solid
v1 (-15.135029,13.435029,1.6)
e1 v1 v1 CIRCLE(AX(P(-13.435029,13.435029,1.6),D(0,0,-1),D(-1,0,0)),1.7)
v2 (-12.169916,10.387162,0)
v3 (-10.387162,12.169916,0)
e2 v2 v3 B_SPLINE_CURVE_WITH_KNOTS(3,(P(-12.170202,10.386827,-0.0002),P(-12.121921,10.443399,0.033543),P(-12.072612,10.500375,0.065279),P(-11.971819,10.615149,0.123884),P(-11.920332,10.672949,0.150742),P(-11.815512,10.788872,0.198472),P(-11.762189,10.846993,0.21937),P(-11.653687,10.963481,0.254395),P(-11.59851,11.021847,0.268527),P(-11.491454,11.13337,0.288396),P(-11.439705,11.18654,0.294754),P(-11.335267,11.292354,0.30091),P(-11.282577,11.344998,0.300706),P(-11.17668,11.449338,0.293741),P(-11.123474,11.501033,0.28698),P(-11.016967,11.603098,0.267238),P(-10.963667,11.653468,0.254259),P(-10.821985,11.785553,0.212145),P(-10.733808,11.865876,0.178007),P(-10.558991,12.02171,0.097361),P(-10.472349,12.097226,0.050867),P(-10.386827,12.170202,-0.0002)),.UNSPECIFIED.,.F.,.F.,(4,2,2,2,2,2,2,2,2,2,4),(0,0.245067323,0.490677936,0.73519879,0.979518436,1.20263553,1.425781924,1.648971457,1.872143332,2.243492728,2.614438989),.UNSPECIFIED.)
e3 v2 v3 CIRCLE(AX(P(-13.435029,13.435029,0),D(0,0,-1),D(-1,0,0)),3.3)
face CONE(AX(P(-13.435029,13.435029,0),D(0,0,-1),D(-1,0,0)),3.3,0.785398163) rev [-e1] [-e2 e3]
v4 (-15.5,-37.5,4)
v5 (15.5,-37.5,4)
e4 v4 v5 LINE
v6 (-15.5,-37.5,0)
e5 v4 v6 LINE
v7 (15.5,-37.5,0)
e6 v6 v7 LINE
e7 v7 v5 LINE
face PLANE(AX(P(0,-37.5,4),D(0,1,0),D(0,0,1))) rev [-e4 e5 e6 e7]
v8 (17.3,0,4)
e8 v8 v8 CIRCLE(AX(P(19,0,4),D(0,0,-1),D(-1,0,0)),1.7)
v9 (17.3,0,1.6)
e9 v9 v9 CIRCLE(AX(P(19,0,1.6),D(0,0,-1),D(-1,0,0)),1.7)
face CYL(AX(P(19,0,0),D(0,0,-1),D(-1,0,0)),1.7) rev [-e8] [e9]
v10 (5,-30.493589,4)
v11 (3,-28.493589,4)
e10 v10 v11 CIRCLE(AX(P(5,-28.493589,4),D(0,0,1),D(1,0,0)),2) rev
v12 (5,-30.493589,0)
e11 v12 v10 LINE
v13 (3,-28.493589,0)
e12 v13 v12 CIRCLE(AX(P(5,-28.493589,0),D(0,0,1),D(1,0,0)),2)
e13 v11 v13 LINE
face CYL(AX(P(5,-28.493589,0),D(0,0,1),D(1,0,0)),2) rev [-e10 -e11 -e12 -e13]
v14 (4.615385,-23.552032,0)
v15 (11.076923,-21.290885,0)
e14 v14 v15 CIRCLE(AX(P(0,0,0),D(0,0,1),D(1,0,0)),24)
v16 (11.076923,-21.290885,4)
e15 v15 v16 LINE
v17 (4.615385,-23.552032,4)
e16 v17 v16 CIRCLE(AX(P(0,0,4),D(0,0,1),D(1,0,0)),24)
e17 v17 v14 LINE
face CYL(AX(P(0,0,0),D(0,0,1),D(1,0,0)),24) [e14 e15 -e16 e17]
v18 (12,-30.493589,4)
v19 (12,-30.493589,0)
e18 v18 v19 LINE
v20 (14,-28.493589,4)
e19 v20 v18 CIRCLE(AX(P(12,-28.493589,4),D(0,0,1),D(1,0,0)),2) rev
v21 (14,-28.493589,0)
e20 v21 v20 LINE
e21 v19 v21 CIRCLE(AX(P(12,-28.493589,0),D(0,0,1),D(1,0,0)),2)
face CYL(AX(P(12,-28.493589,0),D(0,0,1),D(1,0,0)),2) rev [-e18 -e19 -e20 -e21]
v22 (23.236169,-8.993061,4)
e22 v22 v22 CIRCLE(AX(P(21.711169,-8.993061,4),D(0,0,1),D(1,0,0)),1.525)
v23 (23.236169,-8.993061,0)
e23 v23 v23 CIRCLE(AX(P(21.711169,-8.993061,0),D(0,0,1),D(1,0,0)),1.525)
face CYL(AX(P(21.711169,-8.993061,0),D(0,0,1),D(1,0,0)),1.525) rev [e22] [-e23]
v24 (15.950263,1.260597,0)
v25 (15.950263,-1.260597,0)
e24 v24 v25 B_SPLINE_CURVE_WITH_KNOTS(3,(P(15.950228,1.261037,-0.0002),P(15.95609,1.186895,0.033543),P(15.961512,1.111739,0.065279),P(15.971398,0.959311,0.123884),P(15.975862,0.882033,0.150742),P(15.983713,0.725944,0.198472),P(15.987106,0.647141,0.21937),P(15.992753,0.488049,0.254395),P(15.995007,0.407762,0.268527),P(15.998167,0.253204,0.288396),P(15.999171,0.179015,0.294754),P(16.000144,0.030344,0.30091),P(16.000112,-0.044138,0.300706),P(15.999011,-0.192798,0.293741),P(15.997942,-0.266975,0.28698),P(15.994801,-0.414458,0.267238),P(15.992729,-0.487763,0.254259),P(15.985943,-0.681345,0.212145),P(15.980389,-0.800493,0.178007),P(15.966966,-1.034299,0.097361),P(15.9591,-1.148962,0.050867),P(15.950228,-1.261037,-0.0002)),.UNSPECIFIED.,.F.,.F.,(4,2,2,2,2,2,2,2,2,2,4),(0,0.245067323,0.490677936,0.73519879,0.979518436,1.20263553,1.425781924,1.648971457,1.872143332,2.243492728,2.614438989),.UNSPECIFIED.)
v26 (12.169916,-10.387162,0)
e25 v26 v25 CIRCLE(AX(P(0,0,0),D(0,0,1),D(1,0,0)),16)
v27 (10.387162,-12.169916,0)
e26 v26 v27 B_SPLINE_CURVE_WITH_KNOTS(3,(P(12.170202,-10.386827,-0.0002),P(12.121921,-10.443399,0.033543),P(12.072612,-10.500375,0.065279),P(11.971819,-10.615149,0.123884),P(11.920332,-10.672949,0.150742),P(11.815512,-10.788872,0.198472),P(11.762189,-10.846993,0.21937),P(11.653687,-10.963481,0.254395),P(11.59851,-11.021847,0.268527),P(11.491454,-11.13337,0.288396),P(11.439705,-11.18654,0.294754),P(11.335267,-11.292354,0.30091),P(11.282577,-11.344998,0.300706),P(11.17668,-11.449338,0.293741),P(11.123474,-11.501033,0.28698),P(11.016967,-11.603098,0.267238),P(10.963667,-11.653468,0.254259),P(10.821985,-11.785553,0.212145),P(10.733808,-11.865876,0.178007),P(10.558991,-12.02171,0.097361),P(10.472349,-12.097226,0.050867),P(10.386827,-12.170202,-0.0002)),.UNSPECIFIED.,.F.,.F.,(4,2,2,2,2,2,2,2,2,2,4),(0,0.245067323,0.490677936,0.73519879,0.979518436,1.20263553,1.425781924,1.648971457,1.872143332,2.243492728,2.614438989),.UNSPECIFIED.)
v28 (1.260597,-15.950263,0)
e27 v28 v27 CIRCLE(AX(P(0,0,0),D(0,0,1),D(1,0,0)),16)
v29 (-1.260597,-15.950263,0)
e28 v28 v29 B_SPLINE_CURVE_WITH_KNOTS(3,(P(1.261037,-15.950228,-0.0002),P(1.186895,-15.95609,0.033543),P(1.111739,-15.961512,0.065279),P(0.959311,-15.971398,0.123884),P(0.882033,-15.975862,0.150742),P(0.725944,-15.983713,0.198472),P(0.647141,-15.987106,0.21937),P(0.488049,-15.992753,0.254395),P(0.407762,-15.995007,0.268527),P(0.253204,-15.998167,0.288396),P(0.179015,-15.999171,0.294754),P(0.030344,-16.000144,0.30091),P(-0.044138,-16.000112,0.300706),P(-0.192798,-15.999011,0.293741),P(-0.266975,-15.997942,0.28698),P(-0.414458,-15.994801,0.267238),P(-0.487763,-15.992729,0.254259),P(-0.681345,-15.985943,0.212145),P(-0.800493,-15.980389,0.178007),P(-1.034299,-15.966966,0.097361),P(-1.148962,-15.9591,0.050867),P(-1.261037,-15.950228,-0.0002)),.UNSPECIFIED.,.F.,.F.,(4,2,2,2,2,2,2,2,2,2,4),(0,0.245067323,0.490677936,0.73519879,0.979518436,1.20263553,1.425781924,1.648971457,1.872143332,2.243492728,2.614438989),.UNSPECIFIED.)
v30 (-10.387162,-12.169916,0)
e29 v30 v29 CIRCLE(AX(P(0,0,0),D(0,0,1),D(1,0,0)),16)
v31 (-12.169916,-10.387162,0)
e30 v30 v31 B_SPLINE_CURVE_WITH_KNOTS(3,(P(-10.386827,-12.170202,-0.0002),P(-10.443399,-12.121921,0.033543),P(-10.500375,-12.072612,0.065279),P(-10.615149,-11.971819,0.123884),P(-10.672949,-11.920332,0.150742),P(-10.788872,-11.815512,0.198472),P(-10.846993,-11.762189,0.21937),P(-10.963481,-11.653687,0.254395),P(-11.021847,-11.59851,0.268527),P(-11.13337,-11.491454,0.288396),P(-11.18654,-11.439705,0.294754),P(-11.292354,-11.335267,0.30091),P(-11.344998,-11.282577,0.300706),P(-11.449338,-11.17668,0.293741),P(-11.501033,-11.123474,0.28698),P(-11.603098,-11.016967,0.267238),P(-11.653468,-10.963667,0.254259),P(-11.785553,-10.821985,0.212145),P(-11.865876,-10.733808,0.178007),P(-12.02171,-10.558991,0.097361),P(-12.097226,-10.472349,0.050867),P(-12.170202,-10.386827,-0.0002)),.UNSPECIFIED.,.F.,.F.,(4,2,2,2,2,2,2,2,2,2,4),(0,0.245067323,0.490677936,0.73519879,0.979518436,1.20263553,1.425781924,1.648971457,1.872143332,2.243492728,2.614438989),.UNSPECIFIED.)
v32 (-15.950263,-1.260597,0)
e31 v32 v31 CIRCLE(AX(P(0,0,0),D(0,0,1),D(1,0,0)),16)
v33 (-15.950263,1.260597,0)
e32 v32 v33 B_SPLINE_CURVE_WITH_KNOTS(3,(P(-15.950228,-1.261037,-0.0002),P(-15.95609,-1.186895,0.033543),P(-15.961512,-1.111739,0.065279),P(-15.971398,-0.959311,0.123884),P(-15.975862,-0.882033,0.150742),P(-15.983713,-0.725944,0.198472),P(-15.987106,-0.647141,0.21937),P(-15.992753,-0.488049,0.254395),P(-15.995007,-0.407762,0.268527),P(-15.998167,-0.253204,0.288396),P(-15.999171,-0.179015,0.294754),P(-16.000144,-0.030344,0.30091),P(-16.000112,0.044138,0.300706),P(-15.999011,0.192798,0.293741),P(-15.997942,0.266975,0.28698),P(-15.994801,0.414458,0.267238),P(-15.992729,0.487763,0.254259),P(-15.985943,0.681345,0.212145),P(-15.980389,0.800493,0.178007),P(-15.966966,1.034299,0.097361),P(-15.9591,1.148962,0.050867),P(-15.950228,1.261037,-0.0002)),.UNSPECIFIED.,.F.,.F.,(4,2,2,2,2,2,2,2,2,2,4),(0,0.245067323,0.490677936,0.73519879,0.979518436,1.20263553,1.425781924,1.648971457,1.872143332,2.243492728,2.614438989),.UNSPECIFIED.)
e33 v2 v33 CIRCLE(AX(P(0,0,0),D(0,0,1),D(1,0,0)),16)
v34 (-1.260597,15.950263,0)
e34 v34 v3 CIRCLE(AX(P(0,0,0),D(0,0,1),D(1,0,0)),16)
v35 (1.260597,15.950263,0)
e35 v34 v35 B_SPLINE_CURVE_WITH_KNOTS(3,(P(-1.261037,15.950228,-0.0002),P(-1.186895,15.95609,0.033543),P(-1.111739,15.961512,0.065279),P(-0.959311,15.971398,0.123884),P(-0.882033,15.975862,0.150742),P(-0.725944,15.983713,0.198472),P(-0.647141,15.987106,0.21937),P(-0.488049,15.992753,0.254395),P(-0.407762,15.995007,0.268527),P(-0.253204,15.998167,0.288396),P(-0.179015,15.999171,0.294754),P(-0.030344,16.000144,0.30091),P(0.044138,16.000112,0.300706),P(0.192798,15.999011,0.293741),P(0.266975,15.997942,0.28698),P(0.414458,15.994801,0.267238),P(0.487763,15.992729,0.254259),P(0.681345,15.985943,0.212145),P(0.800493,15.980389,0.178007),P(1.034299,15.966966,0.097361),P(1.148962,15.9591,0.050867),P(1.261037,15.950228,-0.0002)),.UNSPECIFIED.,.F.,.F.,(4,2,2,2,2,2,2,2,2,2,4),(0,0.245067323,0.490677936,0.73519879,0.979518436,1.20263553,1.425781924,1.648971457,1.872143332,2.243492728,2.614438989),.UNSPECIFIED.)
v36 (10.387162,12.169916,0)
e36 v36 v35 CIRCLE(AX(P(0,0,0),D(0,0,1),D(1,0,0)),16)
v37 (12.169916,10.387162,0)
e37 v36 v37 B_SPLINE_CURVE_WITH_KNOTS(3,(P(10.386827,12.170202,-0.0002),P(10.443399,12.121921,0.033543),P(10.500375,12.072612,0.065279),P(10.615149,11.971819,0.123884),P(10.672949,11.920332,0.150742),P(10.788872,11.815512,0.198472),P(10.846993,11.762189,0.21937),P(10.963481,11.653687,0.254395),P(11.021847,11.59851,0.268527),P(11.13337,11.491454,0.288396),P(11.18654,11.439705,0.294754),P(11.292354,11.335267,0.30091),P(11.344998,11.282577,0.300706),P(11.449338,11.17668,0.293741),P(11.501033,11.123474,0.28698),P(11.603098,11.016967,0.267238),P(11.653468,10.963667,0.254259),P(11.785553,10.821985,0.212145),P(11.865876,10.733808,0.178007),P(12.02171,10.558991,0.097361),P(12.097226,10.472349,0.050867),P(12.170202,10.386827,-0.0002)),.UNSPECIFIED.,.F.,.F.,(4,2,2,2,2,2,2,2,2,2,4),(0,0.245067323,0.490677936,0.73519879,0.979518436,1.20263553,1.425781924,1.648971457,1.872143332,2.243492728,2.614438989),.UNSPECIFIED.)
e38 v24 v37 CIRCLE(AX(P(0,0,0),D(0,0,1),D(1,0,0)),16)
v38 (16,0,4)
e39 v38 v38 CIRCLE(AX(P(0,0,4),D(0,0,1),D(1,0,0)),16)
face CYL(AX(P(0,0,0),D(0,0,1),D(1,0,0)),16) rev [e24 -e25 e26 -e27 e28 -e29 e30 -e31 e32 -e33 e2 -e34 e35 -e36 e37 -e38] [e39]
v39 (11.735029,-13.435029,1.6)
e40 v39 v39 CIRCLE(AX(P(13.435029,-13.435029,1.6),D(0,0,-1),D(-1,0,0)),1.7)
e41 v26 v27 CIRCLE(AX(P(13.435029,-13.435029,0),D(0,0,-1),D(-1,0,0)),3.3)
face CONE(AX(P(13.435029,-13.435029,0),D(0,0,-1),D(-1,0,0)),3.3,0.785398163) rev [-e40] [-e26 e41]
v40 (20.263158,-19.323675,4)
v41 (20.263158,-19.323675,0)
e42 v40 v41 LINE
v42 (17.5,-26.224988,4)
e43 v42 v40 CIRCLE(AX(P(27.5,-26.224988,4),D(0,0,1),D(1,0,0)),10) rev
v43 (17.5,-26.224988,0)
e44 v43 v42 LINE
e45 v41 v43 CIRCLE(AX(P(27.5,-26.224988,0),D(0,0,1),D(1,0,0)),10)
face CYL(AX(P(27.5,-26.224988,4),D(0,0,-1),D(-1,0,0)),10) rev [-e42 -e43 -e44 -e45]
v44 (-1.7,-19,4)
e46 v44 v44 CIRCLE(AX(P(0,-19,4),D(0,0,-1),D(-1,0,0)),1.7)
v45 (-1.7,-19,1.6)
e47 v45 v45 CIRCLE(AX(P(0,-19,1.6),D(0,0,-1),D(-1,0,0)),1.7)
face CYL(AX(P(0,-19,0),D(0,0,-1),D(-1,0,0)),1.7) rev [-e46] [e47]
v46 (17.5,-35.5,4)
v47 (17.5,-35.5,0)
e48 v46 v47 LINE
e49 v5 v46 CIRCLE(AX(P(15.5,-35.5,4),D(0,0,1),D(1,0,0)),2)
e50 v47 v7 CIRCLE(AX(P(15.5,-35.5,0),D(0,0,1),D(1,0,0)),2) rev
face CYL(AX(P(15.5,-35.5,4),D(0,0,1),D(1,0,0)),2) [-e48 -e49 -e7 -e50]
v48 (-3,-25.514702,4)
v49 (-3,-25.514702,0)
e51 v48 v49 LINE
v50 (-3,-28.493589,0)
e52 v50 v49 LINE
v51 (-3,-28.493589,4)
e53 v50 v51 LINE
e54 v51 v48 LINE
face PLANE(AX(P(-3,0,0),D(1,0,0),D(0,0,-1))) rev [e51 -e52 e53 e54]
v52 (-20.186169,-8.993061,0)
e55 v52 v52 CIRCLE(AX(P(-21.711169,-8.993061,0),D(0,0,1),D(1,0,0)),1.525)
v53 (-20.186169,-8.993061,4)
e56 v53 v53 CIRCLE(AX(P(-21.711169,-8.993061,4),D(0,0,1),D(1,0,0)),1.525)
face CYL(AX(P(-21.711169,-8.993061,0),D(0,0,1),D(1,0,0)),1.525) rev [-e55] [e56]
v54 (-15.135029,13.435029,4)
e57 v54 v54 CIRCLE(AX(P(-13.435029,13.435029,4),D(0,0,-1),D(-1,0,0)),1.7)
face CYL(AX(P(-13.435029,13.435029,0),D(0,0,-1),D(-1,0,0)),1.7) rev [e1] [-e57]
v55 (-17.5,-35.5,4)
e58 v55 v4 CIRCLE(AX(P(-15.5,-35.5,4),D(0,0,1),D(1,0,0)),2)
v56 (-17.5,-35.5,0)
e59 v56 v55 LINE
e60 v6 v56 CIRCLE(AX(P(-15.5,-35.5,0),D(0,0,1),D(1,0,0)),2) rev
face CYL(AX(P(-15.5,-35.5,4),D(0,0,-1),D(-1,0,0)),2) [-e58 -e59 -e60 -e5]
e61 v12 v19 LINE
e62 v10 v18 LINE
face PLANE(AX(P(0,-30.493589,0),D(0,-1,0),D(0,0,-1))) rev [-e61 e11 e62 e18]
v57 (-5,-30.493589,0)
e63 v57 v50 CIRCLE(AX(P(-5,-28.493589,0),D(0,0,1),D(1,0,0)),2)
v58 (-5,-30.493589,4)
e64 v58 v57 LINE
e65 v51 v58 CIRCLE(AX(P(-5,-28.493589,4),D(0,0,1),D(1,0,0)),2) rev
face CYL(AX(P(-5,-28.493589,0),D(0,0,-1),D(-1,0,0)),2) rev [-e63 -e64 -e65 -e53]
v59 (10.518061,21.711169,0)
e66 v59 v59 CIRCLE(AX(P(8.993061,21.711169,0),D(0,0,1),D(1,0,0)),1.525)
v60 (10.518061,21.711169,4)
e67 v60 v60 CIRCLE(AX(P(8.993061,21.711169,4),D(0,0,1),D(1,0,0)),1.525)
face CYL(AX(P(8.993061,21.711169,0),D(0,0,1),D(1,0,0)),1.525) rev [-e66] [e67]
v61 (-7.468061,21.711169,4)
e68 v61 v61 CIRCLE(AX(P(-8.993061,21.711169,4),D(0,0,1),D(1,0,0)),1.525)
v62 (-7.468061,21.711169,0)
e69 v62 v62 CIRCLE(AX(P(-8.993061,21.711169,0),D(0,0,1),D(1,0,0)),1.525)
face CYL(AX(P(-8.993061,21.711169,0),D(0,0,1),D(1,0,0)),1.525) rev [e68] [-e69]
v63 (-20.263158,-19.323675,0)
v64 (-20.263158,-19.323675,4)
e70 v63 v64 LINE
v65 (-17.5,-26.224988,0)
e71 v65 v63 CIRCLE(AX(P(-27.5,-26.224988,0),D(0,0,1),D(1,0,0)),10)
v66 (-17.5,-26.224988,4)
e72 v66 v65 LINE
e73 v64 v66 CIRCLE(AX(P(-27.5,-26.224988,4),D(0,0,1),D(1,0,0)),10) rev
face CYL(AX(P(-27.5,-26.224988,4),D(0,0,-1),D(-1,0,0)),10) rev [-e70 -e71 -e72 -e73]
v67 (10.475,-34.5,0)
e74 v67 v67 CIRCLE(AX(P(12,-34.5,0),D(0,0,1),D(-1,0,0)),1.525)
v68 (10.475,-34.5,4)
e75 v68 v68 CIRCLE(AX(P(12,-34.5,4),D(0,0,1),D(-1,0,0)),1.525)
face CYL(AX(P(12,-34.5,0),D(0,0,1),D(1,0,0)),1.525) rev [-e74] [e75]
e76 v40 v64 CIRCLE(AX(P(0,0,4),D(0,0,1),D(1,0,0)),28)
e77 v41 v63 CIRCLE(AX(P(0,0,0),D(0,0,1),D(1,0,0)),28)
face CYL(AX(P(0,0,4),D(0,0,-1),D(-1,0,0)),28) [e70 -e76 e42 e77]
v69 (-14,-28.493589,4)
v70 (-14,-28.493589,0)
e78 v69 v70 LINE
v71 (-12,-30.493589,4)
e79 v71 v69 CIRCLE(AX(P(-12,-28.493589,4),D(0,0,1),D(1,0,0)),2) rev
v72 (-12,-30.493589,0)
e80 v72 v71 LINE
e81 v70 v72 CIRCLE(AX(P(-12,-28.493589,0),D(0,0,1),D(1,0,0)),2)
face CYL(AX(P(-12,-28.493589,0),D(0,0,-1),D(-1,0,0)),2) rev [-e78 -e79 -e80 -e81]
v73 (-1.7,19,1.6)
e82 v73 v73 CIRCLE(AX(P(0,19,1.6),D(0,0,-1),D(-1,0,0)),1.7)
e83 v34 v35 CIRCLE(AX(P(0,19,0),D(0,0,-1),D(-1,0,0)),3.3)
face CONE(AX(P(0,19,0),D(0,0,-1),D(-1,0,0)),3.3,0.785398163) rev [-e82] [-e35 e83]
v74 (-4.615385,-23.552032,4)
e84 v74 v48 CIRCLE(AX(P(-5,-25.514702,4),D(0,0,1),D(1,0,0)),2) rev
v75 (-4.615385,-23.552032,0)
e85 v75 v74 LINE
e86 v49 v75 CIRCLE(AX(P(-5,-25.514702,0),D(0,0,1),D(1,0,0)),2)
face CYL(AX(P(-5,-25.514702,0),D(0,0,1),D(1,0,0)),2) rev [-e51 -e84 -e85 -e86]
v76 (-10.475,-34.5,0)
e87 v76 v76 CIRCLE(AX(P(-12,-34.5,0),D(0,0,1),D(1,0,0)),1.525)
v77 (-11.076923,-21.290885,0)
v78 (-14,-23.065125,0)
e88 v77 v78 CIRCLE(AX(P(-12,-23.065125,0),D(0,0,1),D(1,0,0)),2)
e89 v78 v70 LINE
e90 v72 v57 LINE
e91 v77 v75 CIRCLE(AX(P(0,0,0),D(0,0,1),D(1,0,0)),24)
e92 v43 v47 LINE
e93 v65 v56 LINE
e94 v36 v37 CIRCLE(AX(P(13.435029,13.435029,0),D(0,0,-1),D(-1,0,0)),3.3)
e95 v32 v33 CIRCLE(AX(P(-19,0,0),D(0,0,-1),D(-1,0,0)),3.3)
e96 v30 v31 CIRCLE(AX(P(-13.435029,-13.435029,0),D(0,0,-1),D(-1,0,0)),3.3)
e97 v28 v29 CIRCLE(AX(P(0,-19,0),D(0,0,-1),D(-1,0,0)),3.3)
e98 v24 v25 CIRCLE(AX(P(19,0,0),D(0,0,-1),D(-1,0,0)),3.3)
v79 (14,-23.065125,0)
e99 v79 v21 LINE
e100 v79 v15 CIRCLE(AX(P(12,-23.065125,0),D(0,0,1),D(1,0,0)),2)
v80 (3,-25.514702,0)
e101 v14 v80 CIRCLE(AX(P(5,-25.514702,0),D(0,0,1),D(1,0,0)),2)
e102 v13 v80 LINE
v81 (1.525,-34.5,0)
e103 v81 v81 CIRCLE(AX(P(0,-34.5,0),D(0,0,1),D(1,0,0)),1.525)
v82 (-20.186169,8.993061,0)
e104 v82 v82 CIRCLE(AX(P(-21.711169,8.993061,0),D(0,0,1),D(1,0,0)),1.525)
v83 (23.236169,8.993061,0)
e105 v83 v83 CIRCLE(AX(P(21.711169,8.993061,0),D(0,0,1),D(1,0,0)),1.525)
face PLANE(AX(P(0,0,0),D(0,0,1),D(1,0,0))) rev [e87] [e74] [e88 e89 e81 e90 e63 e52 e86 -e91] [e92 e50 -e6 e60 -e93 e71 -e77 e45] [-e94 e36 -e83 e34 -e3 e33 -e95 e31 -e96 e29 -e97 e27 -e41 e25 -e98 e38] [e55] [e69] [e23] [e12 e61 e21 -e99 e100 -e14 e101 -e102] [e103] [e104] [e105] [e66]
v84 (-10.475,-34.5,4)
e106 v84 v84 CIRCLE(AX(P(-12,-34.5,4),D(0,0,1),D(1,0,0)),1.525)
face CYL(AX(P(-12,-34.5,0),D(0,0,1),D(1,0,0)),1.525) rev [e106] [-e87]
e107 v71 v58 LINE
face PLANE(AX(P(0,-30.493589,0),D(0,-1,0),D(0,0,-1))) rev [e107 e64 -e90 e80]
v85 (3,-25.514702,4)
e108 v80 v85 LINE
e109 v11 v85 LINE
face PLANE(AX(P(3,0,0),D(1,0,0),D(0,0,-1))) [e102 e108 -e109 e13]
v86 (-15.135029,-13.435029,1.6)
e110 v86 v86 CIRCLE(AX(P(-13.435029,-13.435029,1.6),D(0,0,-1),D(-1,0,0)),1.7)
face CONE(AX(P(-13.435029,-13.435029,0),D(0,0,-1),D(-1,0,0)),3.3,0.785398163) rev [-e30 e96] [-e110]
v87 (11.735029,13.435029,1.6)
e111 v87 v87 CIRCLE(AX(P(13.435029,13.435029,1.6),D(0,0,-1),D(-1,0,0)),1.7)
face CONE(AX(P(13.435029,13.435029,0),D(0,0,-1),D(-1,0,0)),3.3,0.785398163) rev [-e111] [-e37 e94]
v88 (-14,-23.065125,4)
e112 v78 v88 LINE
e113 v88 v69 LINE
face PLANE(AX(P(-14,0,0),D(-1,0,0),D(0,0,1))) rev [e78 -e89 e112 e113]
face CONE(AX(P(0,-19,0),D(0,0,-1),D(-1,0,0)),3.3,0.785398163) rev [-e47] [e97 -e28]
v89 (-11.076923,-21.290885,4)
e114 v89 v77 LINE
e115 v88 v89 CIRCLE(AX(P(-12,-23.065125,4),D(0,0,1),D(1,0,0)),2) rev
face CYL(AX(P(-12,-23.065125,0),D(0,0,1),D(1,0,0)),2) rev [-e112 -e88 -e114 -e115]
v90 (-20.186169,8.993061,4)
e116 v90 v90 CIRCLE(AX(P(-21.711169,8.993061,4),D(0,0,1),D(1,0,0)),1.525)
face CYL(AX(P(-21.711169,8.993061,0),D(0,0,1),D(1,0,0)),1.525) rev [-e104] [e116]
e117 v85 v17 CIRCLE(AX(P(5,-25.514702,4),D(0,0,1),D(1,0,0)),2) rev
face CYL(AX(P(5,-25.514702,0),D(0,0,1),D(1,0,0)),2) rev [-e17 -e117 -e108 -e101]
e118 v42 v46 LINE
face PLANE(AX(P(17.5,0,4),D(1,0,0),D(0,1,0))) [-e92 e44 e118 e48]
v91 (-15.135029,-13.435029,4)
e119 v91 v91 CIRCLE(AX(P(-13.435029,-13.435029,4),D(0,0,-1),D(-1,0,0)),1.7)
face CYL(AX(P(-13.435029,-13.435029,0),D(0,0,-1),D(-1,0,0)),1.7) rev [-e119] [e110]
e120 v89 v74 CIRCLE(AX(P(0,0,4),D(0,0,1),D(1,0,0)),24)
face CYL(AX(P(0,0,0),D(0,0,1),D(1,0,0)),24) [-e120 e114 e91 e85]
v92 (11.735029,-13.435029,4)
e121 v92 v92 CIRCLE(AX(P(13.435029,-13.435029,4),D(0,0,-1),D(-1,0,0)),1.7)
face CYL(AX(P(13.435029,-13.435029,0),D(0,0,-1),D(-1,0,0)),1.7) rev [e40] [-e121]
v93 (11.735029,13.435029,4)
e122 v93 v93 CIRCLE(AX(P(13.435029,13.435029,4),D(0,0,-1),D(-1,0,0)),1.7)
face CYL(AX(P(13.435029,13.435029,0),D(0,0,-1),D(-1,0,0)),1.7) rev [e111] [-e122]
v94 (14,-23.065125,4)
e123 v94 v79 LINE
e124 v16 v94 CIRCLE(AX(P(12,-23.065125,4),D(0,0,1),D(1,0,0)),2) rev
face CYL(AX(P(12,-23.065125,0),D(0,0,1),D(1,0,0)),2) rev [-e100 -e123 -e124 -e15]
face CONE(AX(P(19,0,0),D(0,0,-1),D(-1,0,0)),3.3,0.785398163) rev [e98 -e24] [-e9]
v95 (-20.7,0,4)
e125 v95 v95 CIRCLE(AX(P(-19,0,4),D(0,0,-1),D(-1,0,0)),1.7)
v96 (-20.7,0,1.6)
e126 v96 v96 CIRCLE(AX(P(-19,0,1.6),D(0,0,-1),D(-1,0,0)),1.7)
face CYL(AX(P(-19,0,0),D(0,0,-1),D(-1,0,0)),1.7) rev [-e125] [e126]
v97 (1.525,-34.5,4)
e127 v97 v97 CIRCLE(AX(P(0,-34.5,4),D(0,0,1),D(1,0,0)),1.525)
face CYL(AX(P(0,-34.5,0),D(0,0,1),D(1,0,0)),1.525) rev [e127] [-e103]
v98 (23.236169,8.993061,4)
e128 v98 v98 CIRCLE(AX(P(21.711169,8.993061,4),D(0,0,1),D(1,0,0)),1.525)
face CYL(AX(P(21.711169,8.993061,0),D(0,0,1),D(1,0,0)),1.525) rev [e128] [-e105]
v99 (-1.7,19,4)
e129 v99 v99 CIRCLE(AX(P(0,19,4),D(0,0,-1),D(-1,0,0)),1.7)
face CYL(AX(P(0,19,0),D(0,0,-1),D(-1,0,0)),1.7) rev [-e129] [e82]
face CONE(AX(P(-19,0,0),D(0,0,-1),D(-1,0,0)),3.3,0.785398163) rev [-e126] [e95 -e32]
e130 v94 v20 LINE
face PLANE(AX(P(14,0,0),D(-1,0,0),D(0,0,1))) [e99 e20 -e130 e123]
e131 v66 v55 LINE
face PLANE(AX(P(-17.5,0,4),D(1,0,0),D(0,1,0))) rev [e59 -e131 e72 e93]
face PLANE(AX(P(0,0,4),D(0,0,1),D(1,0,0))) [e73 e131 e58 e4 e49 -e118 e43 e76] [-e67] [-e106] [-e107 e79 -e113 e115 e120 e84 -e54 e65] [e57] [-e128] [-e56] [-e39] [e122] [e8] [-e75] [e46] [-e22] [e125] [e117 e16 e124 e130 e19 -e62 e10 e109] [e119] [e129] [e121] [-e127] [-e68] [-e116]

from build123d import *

# Parameters (mm, degrees)
SKETCH_2_R                   = 28
SKETCH_2_R_2                 = 1.525
SKETCH_2_W                   = 35
SKETCH_2_H                   = 15.642507006
EXTRUDE_1_DEPTH              = 4
SKETCH_3_R                   = 16
CUT_EXTRUDE_1_DEPTH          = 47.97073557
SKETCH_4_R                   = 1.525
CUT_EXTRUDE_2_DEPTH          = 47.97073557
FILLET_1_R                   = 2
FILLET_2_R                   = 10
CUT_EXTRUDE_START            = -4
CUT_EXTRUDE_3_DEPTH          = 4
FILLET_3_R                   = 2
SKETCH_7_R                   = 1.525
CUT_EXTRUDE_4_DEPTH          = 47.97073557
HOLE_WIZARD_M3_1_D           = 3.4
HOLE_WIZARD_M3_1_CSINK_D     = 6.6
HOLE_WIZARD_M3_1_CSINK_ANGLE = 90


# Read off the part's stored shape, not the designer's step: 切除-拉伸3
with BuildPart() as part:
    # 草图2 → 凸台-拉伸1 (new body)
    # profile 1 of 2: a face of its own
    with BuildSketch(Plane.XY):
        Circle(SKETCH_2_R)
        with Locations((19, 0)):
            Circle(SKETCH_2_R_2, mode=Mode.SUBTRACT)
        with Locations((13.435028843, -13.435028843)):
            Circle(SKETCH_2_R_2, mode=Mode.SUBTRACT)
        with Locations((0, -19)):
            Circle(SKETCH_2_R_2, mode=Mode.SUBTRACT)
        with Locations((-13.435028843, -13.435028843)):
            Circle(SKETCH_2_R_2, mode=Mode.SUBTRACT)
        with Locations((-19, 0)):
            Circle(SKETCH_2_R_2, mode=Mode.SUBTRACT)
        with Locations((-13.435028843, 13.435028843)):
            Circle(SKETCH_2_R_2, mode=Mode.SUBTRACT)
        with Locations((0, 19)):
            Circle(SKETCH_2_R_2, mode=Mode.SUBTRACT)
        with Locations((13.435028843, 13.435028843)):
            Circle(SKETCH_2_R_2, mode=Mode.SUBTRACT)
    # profile 2 of 2: a face of its own
    with BuildSketch(Plane.XY):
        with Locations((0, -29.678746497)):
            Rectangle(SKETCH_2_W, SKETCH_2_H)
    extrude(amount=EXTRUDE_1_DEPTH)

    # 草图3 → 切除-拉伸1 (cut, through all)
    with BuildSketch(Plane.XY.offset(4)):
        Circle(SKETCH_3_R)
    extrude(amount=-CUT_EXTRUDE_1_DEPTH, mode=Mode.SUBTRACT)

    # 草图4 → 切除-拉伸2 (cut, through all)
    with BuildSketch(Plane.XY.offset(4)):
        with Locations((0, -34.5)):
            Circle(SKETCH_4_R)
        with Locations((-12, -34.5)):
            Circle(SKETCH_4_R)
        with Locations(Location((12, -34.5, 0), (0, 0, 180))):
            Circle(SKETCH_4_R)
    extrude(amount=-CUT_EXTRUDE_2_DEPTH, mode=Mode.SUBTRACT)

    # 圆角1
    fillet_1_edges = [part.edges().sort_by_distance(p)[0] for p in [
        (17.5, -37.5, 2),
        (-17.5, -37.5, 2),
    ]]
    fillet(fillet_1_edges, radius=FILLET_1_R)

    # 圆角2
    fillet_2_edges = [part.edges().sort_by_distance(p)[0] for p in [
        (17.5, -21.857492994, 2),
        (-17.5, -21.857492994, 2),
    ]]
    fillet(fillet_2_edges, radius=FILLET_2_R)

    # 切除-拉伸3 outline → 切除-拉伸3 (cut)
    with BuildSketch(Plane.XY.offset(4).offset(CUT_EXTRUDE_START)):
        with BuildLine():
            ThreePointArc((14, -19.49358869), (8.769929005, -22.340285254), (3, -23.8117618))
            Line((3, -23.8117618), (3, -30.49358869))
            Line((3, -30.49358869), (14, -30.49358869))
            Line((14, -30.49358869), (14, -19.49358869))
        make_face()
        with BuildLine():
            ThreePointArc((-3, -23.8117618), (-8.769929005, -22.340285254), (-14, -19.49358869))
            Line((-14, -19.49358869), (-14, -30.49358869))
            Line((-14, -30.49358869), (-3, -30.49358869))
            Line((-3, -30.49358869), (-3, -23.8117618))
        make_face()
    extrude(amount=CUT_EXTRUDE_3_DEPTH, mode=Mode.SUBTRACT)

    # 圆角3
    fillet_3_edges = [part.edges().sort_by_distance(p)[0] for p in [
        (-14, -19.49358869, 2),
        (-3, -23.8117618, 2),
        (-3, -30.49358869, 2),
        (-14, -30.49358869, 2),
        (3, -23.8117618, 2),
        (14, -19.49358869, 2),
        (14, -30.49358869, 2),
        (3, -30.49358869, 2),
    ]]
    fillet(fillet_3_edges, radius=FILLET_3_R)

    # 草图7 → 切除-拉伸4 (cut, through all)
    with BuildSketch(Plane.XY.offset(4)):
        with Locations((21.711169014, 8.993060661)):
            Circle(SKETCH_7_R)
        with Locations((21.711169014, -8.993060661)):
            Circle(SKETCH_7_R)
        with Locations((-21.711169014, -8.993060661)):
            Circle(SKETCH_7_R)
        with Locations((-21.711169014, 8.993060661)):
            Circle(SKETCH_7_R)
        with Locations((-8.993060661, 21.711169014)):
            Circle(SKETCH_7_R)
        with Locations((8.993060661, 21.711169014)):
            Circle(SKETCH_7_R)
    extrude(amount=-CUT_EXTRUDE_4_DEPTH, mode=Mode.SUBTRACT)

    # M3 开槽沉头木螺钉的锥形沉头孔1 (through all)
    with Locations(Plane(origin=(0, 0, 0), x_dir=(-1, 0, 0), z_dir=(0, 0, -1))):
        with Locations((-19, 0), (-13.435028842, 13.435028843), (0, 19), (13.435028843, 13.435028843), (19, 0), (13.435028843, -13.435028843), (0, -19), (-13.435028843, -13.435028843)):
            CounterSinkHole(HOLE_WIZARD_M3_1_D / 2, HOLE_WIZARD_M3_1_CSINK_D / 2, counter_sink_angle=HOLE_WIZARD_M3_1_CSINK_ANGLE)


solid = part.part
